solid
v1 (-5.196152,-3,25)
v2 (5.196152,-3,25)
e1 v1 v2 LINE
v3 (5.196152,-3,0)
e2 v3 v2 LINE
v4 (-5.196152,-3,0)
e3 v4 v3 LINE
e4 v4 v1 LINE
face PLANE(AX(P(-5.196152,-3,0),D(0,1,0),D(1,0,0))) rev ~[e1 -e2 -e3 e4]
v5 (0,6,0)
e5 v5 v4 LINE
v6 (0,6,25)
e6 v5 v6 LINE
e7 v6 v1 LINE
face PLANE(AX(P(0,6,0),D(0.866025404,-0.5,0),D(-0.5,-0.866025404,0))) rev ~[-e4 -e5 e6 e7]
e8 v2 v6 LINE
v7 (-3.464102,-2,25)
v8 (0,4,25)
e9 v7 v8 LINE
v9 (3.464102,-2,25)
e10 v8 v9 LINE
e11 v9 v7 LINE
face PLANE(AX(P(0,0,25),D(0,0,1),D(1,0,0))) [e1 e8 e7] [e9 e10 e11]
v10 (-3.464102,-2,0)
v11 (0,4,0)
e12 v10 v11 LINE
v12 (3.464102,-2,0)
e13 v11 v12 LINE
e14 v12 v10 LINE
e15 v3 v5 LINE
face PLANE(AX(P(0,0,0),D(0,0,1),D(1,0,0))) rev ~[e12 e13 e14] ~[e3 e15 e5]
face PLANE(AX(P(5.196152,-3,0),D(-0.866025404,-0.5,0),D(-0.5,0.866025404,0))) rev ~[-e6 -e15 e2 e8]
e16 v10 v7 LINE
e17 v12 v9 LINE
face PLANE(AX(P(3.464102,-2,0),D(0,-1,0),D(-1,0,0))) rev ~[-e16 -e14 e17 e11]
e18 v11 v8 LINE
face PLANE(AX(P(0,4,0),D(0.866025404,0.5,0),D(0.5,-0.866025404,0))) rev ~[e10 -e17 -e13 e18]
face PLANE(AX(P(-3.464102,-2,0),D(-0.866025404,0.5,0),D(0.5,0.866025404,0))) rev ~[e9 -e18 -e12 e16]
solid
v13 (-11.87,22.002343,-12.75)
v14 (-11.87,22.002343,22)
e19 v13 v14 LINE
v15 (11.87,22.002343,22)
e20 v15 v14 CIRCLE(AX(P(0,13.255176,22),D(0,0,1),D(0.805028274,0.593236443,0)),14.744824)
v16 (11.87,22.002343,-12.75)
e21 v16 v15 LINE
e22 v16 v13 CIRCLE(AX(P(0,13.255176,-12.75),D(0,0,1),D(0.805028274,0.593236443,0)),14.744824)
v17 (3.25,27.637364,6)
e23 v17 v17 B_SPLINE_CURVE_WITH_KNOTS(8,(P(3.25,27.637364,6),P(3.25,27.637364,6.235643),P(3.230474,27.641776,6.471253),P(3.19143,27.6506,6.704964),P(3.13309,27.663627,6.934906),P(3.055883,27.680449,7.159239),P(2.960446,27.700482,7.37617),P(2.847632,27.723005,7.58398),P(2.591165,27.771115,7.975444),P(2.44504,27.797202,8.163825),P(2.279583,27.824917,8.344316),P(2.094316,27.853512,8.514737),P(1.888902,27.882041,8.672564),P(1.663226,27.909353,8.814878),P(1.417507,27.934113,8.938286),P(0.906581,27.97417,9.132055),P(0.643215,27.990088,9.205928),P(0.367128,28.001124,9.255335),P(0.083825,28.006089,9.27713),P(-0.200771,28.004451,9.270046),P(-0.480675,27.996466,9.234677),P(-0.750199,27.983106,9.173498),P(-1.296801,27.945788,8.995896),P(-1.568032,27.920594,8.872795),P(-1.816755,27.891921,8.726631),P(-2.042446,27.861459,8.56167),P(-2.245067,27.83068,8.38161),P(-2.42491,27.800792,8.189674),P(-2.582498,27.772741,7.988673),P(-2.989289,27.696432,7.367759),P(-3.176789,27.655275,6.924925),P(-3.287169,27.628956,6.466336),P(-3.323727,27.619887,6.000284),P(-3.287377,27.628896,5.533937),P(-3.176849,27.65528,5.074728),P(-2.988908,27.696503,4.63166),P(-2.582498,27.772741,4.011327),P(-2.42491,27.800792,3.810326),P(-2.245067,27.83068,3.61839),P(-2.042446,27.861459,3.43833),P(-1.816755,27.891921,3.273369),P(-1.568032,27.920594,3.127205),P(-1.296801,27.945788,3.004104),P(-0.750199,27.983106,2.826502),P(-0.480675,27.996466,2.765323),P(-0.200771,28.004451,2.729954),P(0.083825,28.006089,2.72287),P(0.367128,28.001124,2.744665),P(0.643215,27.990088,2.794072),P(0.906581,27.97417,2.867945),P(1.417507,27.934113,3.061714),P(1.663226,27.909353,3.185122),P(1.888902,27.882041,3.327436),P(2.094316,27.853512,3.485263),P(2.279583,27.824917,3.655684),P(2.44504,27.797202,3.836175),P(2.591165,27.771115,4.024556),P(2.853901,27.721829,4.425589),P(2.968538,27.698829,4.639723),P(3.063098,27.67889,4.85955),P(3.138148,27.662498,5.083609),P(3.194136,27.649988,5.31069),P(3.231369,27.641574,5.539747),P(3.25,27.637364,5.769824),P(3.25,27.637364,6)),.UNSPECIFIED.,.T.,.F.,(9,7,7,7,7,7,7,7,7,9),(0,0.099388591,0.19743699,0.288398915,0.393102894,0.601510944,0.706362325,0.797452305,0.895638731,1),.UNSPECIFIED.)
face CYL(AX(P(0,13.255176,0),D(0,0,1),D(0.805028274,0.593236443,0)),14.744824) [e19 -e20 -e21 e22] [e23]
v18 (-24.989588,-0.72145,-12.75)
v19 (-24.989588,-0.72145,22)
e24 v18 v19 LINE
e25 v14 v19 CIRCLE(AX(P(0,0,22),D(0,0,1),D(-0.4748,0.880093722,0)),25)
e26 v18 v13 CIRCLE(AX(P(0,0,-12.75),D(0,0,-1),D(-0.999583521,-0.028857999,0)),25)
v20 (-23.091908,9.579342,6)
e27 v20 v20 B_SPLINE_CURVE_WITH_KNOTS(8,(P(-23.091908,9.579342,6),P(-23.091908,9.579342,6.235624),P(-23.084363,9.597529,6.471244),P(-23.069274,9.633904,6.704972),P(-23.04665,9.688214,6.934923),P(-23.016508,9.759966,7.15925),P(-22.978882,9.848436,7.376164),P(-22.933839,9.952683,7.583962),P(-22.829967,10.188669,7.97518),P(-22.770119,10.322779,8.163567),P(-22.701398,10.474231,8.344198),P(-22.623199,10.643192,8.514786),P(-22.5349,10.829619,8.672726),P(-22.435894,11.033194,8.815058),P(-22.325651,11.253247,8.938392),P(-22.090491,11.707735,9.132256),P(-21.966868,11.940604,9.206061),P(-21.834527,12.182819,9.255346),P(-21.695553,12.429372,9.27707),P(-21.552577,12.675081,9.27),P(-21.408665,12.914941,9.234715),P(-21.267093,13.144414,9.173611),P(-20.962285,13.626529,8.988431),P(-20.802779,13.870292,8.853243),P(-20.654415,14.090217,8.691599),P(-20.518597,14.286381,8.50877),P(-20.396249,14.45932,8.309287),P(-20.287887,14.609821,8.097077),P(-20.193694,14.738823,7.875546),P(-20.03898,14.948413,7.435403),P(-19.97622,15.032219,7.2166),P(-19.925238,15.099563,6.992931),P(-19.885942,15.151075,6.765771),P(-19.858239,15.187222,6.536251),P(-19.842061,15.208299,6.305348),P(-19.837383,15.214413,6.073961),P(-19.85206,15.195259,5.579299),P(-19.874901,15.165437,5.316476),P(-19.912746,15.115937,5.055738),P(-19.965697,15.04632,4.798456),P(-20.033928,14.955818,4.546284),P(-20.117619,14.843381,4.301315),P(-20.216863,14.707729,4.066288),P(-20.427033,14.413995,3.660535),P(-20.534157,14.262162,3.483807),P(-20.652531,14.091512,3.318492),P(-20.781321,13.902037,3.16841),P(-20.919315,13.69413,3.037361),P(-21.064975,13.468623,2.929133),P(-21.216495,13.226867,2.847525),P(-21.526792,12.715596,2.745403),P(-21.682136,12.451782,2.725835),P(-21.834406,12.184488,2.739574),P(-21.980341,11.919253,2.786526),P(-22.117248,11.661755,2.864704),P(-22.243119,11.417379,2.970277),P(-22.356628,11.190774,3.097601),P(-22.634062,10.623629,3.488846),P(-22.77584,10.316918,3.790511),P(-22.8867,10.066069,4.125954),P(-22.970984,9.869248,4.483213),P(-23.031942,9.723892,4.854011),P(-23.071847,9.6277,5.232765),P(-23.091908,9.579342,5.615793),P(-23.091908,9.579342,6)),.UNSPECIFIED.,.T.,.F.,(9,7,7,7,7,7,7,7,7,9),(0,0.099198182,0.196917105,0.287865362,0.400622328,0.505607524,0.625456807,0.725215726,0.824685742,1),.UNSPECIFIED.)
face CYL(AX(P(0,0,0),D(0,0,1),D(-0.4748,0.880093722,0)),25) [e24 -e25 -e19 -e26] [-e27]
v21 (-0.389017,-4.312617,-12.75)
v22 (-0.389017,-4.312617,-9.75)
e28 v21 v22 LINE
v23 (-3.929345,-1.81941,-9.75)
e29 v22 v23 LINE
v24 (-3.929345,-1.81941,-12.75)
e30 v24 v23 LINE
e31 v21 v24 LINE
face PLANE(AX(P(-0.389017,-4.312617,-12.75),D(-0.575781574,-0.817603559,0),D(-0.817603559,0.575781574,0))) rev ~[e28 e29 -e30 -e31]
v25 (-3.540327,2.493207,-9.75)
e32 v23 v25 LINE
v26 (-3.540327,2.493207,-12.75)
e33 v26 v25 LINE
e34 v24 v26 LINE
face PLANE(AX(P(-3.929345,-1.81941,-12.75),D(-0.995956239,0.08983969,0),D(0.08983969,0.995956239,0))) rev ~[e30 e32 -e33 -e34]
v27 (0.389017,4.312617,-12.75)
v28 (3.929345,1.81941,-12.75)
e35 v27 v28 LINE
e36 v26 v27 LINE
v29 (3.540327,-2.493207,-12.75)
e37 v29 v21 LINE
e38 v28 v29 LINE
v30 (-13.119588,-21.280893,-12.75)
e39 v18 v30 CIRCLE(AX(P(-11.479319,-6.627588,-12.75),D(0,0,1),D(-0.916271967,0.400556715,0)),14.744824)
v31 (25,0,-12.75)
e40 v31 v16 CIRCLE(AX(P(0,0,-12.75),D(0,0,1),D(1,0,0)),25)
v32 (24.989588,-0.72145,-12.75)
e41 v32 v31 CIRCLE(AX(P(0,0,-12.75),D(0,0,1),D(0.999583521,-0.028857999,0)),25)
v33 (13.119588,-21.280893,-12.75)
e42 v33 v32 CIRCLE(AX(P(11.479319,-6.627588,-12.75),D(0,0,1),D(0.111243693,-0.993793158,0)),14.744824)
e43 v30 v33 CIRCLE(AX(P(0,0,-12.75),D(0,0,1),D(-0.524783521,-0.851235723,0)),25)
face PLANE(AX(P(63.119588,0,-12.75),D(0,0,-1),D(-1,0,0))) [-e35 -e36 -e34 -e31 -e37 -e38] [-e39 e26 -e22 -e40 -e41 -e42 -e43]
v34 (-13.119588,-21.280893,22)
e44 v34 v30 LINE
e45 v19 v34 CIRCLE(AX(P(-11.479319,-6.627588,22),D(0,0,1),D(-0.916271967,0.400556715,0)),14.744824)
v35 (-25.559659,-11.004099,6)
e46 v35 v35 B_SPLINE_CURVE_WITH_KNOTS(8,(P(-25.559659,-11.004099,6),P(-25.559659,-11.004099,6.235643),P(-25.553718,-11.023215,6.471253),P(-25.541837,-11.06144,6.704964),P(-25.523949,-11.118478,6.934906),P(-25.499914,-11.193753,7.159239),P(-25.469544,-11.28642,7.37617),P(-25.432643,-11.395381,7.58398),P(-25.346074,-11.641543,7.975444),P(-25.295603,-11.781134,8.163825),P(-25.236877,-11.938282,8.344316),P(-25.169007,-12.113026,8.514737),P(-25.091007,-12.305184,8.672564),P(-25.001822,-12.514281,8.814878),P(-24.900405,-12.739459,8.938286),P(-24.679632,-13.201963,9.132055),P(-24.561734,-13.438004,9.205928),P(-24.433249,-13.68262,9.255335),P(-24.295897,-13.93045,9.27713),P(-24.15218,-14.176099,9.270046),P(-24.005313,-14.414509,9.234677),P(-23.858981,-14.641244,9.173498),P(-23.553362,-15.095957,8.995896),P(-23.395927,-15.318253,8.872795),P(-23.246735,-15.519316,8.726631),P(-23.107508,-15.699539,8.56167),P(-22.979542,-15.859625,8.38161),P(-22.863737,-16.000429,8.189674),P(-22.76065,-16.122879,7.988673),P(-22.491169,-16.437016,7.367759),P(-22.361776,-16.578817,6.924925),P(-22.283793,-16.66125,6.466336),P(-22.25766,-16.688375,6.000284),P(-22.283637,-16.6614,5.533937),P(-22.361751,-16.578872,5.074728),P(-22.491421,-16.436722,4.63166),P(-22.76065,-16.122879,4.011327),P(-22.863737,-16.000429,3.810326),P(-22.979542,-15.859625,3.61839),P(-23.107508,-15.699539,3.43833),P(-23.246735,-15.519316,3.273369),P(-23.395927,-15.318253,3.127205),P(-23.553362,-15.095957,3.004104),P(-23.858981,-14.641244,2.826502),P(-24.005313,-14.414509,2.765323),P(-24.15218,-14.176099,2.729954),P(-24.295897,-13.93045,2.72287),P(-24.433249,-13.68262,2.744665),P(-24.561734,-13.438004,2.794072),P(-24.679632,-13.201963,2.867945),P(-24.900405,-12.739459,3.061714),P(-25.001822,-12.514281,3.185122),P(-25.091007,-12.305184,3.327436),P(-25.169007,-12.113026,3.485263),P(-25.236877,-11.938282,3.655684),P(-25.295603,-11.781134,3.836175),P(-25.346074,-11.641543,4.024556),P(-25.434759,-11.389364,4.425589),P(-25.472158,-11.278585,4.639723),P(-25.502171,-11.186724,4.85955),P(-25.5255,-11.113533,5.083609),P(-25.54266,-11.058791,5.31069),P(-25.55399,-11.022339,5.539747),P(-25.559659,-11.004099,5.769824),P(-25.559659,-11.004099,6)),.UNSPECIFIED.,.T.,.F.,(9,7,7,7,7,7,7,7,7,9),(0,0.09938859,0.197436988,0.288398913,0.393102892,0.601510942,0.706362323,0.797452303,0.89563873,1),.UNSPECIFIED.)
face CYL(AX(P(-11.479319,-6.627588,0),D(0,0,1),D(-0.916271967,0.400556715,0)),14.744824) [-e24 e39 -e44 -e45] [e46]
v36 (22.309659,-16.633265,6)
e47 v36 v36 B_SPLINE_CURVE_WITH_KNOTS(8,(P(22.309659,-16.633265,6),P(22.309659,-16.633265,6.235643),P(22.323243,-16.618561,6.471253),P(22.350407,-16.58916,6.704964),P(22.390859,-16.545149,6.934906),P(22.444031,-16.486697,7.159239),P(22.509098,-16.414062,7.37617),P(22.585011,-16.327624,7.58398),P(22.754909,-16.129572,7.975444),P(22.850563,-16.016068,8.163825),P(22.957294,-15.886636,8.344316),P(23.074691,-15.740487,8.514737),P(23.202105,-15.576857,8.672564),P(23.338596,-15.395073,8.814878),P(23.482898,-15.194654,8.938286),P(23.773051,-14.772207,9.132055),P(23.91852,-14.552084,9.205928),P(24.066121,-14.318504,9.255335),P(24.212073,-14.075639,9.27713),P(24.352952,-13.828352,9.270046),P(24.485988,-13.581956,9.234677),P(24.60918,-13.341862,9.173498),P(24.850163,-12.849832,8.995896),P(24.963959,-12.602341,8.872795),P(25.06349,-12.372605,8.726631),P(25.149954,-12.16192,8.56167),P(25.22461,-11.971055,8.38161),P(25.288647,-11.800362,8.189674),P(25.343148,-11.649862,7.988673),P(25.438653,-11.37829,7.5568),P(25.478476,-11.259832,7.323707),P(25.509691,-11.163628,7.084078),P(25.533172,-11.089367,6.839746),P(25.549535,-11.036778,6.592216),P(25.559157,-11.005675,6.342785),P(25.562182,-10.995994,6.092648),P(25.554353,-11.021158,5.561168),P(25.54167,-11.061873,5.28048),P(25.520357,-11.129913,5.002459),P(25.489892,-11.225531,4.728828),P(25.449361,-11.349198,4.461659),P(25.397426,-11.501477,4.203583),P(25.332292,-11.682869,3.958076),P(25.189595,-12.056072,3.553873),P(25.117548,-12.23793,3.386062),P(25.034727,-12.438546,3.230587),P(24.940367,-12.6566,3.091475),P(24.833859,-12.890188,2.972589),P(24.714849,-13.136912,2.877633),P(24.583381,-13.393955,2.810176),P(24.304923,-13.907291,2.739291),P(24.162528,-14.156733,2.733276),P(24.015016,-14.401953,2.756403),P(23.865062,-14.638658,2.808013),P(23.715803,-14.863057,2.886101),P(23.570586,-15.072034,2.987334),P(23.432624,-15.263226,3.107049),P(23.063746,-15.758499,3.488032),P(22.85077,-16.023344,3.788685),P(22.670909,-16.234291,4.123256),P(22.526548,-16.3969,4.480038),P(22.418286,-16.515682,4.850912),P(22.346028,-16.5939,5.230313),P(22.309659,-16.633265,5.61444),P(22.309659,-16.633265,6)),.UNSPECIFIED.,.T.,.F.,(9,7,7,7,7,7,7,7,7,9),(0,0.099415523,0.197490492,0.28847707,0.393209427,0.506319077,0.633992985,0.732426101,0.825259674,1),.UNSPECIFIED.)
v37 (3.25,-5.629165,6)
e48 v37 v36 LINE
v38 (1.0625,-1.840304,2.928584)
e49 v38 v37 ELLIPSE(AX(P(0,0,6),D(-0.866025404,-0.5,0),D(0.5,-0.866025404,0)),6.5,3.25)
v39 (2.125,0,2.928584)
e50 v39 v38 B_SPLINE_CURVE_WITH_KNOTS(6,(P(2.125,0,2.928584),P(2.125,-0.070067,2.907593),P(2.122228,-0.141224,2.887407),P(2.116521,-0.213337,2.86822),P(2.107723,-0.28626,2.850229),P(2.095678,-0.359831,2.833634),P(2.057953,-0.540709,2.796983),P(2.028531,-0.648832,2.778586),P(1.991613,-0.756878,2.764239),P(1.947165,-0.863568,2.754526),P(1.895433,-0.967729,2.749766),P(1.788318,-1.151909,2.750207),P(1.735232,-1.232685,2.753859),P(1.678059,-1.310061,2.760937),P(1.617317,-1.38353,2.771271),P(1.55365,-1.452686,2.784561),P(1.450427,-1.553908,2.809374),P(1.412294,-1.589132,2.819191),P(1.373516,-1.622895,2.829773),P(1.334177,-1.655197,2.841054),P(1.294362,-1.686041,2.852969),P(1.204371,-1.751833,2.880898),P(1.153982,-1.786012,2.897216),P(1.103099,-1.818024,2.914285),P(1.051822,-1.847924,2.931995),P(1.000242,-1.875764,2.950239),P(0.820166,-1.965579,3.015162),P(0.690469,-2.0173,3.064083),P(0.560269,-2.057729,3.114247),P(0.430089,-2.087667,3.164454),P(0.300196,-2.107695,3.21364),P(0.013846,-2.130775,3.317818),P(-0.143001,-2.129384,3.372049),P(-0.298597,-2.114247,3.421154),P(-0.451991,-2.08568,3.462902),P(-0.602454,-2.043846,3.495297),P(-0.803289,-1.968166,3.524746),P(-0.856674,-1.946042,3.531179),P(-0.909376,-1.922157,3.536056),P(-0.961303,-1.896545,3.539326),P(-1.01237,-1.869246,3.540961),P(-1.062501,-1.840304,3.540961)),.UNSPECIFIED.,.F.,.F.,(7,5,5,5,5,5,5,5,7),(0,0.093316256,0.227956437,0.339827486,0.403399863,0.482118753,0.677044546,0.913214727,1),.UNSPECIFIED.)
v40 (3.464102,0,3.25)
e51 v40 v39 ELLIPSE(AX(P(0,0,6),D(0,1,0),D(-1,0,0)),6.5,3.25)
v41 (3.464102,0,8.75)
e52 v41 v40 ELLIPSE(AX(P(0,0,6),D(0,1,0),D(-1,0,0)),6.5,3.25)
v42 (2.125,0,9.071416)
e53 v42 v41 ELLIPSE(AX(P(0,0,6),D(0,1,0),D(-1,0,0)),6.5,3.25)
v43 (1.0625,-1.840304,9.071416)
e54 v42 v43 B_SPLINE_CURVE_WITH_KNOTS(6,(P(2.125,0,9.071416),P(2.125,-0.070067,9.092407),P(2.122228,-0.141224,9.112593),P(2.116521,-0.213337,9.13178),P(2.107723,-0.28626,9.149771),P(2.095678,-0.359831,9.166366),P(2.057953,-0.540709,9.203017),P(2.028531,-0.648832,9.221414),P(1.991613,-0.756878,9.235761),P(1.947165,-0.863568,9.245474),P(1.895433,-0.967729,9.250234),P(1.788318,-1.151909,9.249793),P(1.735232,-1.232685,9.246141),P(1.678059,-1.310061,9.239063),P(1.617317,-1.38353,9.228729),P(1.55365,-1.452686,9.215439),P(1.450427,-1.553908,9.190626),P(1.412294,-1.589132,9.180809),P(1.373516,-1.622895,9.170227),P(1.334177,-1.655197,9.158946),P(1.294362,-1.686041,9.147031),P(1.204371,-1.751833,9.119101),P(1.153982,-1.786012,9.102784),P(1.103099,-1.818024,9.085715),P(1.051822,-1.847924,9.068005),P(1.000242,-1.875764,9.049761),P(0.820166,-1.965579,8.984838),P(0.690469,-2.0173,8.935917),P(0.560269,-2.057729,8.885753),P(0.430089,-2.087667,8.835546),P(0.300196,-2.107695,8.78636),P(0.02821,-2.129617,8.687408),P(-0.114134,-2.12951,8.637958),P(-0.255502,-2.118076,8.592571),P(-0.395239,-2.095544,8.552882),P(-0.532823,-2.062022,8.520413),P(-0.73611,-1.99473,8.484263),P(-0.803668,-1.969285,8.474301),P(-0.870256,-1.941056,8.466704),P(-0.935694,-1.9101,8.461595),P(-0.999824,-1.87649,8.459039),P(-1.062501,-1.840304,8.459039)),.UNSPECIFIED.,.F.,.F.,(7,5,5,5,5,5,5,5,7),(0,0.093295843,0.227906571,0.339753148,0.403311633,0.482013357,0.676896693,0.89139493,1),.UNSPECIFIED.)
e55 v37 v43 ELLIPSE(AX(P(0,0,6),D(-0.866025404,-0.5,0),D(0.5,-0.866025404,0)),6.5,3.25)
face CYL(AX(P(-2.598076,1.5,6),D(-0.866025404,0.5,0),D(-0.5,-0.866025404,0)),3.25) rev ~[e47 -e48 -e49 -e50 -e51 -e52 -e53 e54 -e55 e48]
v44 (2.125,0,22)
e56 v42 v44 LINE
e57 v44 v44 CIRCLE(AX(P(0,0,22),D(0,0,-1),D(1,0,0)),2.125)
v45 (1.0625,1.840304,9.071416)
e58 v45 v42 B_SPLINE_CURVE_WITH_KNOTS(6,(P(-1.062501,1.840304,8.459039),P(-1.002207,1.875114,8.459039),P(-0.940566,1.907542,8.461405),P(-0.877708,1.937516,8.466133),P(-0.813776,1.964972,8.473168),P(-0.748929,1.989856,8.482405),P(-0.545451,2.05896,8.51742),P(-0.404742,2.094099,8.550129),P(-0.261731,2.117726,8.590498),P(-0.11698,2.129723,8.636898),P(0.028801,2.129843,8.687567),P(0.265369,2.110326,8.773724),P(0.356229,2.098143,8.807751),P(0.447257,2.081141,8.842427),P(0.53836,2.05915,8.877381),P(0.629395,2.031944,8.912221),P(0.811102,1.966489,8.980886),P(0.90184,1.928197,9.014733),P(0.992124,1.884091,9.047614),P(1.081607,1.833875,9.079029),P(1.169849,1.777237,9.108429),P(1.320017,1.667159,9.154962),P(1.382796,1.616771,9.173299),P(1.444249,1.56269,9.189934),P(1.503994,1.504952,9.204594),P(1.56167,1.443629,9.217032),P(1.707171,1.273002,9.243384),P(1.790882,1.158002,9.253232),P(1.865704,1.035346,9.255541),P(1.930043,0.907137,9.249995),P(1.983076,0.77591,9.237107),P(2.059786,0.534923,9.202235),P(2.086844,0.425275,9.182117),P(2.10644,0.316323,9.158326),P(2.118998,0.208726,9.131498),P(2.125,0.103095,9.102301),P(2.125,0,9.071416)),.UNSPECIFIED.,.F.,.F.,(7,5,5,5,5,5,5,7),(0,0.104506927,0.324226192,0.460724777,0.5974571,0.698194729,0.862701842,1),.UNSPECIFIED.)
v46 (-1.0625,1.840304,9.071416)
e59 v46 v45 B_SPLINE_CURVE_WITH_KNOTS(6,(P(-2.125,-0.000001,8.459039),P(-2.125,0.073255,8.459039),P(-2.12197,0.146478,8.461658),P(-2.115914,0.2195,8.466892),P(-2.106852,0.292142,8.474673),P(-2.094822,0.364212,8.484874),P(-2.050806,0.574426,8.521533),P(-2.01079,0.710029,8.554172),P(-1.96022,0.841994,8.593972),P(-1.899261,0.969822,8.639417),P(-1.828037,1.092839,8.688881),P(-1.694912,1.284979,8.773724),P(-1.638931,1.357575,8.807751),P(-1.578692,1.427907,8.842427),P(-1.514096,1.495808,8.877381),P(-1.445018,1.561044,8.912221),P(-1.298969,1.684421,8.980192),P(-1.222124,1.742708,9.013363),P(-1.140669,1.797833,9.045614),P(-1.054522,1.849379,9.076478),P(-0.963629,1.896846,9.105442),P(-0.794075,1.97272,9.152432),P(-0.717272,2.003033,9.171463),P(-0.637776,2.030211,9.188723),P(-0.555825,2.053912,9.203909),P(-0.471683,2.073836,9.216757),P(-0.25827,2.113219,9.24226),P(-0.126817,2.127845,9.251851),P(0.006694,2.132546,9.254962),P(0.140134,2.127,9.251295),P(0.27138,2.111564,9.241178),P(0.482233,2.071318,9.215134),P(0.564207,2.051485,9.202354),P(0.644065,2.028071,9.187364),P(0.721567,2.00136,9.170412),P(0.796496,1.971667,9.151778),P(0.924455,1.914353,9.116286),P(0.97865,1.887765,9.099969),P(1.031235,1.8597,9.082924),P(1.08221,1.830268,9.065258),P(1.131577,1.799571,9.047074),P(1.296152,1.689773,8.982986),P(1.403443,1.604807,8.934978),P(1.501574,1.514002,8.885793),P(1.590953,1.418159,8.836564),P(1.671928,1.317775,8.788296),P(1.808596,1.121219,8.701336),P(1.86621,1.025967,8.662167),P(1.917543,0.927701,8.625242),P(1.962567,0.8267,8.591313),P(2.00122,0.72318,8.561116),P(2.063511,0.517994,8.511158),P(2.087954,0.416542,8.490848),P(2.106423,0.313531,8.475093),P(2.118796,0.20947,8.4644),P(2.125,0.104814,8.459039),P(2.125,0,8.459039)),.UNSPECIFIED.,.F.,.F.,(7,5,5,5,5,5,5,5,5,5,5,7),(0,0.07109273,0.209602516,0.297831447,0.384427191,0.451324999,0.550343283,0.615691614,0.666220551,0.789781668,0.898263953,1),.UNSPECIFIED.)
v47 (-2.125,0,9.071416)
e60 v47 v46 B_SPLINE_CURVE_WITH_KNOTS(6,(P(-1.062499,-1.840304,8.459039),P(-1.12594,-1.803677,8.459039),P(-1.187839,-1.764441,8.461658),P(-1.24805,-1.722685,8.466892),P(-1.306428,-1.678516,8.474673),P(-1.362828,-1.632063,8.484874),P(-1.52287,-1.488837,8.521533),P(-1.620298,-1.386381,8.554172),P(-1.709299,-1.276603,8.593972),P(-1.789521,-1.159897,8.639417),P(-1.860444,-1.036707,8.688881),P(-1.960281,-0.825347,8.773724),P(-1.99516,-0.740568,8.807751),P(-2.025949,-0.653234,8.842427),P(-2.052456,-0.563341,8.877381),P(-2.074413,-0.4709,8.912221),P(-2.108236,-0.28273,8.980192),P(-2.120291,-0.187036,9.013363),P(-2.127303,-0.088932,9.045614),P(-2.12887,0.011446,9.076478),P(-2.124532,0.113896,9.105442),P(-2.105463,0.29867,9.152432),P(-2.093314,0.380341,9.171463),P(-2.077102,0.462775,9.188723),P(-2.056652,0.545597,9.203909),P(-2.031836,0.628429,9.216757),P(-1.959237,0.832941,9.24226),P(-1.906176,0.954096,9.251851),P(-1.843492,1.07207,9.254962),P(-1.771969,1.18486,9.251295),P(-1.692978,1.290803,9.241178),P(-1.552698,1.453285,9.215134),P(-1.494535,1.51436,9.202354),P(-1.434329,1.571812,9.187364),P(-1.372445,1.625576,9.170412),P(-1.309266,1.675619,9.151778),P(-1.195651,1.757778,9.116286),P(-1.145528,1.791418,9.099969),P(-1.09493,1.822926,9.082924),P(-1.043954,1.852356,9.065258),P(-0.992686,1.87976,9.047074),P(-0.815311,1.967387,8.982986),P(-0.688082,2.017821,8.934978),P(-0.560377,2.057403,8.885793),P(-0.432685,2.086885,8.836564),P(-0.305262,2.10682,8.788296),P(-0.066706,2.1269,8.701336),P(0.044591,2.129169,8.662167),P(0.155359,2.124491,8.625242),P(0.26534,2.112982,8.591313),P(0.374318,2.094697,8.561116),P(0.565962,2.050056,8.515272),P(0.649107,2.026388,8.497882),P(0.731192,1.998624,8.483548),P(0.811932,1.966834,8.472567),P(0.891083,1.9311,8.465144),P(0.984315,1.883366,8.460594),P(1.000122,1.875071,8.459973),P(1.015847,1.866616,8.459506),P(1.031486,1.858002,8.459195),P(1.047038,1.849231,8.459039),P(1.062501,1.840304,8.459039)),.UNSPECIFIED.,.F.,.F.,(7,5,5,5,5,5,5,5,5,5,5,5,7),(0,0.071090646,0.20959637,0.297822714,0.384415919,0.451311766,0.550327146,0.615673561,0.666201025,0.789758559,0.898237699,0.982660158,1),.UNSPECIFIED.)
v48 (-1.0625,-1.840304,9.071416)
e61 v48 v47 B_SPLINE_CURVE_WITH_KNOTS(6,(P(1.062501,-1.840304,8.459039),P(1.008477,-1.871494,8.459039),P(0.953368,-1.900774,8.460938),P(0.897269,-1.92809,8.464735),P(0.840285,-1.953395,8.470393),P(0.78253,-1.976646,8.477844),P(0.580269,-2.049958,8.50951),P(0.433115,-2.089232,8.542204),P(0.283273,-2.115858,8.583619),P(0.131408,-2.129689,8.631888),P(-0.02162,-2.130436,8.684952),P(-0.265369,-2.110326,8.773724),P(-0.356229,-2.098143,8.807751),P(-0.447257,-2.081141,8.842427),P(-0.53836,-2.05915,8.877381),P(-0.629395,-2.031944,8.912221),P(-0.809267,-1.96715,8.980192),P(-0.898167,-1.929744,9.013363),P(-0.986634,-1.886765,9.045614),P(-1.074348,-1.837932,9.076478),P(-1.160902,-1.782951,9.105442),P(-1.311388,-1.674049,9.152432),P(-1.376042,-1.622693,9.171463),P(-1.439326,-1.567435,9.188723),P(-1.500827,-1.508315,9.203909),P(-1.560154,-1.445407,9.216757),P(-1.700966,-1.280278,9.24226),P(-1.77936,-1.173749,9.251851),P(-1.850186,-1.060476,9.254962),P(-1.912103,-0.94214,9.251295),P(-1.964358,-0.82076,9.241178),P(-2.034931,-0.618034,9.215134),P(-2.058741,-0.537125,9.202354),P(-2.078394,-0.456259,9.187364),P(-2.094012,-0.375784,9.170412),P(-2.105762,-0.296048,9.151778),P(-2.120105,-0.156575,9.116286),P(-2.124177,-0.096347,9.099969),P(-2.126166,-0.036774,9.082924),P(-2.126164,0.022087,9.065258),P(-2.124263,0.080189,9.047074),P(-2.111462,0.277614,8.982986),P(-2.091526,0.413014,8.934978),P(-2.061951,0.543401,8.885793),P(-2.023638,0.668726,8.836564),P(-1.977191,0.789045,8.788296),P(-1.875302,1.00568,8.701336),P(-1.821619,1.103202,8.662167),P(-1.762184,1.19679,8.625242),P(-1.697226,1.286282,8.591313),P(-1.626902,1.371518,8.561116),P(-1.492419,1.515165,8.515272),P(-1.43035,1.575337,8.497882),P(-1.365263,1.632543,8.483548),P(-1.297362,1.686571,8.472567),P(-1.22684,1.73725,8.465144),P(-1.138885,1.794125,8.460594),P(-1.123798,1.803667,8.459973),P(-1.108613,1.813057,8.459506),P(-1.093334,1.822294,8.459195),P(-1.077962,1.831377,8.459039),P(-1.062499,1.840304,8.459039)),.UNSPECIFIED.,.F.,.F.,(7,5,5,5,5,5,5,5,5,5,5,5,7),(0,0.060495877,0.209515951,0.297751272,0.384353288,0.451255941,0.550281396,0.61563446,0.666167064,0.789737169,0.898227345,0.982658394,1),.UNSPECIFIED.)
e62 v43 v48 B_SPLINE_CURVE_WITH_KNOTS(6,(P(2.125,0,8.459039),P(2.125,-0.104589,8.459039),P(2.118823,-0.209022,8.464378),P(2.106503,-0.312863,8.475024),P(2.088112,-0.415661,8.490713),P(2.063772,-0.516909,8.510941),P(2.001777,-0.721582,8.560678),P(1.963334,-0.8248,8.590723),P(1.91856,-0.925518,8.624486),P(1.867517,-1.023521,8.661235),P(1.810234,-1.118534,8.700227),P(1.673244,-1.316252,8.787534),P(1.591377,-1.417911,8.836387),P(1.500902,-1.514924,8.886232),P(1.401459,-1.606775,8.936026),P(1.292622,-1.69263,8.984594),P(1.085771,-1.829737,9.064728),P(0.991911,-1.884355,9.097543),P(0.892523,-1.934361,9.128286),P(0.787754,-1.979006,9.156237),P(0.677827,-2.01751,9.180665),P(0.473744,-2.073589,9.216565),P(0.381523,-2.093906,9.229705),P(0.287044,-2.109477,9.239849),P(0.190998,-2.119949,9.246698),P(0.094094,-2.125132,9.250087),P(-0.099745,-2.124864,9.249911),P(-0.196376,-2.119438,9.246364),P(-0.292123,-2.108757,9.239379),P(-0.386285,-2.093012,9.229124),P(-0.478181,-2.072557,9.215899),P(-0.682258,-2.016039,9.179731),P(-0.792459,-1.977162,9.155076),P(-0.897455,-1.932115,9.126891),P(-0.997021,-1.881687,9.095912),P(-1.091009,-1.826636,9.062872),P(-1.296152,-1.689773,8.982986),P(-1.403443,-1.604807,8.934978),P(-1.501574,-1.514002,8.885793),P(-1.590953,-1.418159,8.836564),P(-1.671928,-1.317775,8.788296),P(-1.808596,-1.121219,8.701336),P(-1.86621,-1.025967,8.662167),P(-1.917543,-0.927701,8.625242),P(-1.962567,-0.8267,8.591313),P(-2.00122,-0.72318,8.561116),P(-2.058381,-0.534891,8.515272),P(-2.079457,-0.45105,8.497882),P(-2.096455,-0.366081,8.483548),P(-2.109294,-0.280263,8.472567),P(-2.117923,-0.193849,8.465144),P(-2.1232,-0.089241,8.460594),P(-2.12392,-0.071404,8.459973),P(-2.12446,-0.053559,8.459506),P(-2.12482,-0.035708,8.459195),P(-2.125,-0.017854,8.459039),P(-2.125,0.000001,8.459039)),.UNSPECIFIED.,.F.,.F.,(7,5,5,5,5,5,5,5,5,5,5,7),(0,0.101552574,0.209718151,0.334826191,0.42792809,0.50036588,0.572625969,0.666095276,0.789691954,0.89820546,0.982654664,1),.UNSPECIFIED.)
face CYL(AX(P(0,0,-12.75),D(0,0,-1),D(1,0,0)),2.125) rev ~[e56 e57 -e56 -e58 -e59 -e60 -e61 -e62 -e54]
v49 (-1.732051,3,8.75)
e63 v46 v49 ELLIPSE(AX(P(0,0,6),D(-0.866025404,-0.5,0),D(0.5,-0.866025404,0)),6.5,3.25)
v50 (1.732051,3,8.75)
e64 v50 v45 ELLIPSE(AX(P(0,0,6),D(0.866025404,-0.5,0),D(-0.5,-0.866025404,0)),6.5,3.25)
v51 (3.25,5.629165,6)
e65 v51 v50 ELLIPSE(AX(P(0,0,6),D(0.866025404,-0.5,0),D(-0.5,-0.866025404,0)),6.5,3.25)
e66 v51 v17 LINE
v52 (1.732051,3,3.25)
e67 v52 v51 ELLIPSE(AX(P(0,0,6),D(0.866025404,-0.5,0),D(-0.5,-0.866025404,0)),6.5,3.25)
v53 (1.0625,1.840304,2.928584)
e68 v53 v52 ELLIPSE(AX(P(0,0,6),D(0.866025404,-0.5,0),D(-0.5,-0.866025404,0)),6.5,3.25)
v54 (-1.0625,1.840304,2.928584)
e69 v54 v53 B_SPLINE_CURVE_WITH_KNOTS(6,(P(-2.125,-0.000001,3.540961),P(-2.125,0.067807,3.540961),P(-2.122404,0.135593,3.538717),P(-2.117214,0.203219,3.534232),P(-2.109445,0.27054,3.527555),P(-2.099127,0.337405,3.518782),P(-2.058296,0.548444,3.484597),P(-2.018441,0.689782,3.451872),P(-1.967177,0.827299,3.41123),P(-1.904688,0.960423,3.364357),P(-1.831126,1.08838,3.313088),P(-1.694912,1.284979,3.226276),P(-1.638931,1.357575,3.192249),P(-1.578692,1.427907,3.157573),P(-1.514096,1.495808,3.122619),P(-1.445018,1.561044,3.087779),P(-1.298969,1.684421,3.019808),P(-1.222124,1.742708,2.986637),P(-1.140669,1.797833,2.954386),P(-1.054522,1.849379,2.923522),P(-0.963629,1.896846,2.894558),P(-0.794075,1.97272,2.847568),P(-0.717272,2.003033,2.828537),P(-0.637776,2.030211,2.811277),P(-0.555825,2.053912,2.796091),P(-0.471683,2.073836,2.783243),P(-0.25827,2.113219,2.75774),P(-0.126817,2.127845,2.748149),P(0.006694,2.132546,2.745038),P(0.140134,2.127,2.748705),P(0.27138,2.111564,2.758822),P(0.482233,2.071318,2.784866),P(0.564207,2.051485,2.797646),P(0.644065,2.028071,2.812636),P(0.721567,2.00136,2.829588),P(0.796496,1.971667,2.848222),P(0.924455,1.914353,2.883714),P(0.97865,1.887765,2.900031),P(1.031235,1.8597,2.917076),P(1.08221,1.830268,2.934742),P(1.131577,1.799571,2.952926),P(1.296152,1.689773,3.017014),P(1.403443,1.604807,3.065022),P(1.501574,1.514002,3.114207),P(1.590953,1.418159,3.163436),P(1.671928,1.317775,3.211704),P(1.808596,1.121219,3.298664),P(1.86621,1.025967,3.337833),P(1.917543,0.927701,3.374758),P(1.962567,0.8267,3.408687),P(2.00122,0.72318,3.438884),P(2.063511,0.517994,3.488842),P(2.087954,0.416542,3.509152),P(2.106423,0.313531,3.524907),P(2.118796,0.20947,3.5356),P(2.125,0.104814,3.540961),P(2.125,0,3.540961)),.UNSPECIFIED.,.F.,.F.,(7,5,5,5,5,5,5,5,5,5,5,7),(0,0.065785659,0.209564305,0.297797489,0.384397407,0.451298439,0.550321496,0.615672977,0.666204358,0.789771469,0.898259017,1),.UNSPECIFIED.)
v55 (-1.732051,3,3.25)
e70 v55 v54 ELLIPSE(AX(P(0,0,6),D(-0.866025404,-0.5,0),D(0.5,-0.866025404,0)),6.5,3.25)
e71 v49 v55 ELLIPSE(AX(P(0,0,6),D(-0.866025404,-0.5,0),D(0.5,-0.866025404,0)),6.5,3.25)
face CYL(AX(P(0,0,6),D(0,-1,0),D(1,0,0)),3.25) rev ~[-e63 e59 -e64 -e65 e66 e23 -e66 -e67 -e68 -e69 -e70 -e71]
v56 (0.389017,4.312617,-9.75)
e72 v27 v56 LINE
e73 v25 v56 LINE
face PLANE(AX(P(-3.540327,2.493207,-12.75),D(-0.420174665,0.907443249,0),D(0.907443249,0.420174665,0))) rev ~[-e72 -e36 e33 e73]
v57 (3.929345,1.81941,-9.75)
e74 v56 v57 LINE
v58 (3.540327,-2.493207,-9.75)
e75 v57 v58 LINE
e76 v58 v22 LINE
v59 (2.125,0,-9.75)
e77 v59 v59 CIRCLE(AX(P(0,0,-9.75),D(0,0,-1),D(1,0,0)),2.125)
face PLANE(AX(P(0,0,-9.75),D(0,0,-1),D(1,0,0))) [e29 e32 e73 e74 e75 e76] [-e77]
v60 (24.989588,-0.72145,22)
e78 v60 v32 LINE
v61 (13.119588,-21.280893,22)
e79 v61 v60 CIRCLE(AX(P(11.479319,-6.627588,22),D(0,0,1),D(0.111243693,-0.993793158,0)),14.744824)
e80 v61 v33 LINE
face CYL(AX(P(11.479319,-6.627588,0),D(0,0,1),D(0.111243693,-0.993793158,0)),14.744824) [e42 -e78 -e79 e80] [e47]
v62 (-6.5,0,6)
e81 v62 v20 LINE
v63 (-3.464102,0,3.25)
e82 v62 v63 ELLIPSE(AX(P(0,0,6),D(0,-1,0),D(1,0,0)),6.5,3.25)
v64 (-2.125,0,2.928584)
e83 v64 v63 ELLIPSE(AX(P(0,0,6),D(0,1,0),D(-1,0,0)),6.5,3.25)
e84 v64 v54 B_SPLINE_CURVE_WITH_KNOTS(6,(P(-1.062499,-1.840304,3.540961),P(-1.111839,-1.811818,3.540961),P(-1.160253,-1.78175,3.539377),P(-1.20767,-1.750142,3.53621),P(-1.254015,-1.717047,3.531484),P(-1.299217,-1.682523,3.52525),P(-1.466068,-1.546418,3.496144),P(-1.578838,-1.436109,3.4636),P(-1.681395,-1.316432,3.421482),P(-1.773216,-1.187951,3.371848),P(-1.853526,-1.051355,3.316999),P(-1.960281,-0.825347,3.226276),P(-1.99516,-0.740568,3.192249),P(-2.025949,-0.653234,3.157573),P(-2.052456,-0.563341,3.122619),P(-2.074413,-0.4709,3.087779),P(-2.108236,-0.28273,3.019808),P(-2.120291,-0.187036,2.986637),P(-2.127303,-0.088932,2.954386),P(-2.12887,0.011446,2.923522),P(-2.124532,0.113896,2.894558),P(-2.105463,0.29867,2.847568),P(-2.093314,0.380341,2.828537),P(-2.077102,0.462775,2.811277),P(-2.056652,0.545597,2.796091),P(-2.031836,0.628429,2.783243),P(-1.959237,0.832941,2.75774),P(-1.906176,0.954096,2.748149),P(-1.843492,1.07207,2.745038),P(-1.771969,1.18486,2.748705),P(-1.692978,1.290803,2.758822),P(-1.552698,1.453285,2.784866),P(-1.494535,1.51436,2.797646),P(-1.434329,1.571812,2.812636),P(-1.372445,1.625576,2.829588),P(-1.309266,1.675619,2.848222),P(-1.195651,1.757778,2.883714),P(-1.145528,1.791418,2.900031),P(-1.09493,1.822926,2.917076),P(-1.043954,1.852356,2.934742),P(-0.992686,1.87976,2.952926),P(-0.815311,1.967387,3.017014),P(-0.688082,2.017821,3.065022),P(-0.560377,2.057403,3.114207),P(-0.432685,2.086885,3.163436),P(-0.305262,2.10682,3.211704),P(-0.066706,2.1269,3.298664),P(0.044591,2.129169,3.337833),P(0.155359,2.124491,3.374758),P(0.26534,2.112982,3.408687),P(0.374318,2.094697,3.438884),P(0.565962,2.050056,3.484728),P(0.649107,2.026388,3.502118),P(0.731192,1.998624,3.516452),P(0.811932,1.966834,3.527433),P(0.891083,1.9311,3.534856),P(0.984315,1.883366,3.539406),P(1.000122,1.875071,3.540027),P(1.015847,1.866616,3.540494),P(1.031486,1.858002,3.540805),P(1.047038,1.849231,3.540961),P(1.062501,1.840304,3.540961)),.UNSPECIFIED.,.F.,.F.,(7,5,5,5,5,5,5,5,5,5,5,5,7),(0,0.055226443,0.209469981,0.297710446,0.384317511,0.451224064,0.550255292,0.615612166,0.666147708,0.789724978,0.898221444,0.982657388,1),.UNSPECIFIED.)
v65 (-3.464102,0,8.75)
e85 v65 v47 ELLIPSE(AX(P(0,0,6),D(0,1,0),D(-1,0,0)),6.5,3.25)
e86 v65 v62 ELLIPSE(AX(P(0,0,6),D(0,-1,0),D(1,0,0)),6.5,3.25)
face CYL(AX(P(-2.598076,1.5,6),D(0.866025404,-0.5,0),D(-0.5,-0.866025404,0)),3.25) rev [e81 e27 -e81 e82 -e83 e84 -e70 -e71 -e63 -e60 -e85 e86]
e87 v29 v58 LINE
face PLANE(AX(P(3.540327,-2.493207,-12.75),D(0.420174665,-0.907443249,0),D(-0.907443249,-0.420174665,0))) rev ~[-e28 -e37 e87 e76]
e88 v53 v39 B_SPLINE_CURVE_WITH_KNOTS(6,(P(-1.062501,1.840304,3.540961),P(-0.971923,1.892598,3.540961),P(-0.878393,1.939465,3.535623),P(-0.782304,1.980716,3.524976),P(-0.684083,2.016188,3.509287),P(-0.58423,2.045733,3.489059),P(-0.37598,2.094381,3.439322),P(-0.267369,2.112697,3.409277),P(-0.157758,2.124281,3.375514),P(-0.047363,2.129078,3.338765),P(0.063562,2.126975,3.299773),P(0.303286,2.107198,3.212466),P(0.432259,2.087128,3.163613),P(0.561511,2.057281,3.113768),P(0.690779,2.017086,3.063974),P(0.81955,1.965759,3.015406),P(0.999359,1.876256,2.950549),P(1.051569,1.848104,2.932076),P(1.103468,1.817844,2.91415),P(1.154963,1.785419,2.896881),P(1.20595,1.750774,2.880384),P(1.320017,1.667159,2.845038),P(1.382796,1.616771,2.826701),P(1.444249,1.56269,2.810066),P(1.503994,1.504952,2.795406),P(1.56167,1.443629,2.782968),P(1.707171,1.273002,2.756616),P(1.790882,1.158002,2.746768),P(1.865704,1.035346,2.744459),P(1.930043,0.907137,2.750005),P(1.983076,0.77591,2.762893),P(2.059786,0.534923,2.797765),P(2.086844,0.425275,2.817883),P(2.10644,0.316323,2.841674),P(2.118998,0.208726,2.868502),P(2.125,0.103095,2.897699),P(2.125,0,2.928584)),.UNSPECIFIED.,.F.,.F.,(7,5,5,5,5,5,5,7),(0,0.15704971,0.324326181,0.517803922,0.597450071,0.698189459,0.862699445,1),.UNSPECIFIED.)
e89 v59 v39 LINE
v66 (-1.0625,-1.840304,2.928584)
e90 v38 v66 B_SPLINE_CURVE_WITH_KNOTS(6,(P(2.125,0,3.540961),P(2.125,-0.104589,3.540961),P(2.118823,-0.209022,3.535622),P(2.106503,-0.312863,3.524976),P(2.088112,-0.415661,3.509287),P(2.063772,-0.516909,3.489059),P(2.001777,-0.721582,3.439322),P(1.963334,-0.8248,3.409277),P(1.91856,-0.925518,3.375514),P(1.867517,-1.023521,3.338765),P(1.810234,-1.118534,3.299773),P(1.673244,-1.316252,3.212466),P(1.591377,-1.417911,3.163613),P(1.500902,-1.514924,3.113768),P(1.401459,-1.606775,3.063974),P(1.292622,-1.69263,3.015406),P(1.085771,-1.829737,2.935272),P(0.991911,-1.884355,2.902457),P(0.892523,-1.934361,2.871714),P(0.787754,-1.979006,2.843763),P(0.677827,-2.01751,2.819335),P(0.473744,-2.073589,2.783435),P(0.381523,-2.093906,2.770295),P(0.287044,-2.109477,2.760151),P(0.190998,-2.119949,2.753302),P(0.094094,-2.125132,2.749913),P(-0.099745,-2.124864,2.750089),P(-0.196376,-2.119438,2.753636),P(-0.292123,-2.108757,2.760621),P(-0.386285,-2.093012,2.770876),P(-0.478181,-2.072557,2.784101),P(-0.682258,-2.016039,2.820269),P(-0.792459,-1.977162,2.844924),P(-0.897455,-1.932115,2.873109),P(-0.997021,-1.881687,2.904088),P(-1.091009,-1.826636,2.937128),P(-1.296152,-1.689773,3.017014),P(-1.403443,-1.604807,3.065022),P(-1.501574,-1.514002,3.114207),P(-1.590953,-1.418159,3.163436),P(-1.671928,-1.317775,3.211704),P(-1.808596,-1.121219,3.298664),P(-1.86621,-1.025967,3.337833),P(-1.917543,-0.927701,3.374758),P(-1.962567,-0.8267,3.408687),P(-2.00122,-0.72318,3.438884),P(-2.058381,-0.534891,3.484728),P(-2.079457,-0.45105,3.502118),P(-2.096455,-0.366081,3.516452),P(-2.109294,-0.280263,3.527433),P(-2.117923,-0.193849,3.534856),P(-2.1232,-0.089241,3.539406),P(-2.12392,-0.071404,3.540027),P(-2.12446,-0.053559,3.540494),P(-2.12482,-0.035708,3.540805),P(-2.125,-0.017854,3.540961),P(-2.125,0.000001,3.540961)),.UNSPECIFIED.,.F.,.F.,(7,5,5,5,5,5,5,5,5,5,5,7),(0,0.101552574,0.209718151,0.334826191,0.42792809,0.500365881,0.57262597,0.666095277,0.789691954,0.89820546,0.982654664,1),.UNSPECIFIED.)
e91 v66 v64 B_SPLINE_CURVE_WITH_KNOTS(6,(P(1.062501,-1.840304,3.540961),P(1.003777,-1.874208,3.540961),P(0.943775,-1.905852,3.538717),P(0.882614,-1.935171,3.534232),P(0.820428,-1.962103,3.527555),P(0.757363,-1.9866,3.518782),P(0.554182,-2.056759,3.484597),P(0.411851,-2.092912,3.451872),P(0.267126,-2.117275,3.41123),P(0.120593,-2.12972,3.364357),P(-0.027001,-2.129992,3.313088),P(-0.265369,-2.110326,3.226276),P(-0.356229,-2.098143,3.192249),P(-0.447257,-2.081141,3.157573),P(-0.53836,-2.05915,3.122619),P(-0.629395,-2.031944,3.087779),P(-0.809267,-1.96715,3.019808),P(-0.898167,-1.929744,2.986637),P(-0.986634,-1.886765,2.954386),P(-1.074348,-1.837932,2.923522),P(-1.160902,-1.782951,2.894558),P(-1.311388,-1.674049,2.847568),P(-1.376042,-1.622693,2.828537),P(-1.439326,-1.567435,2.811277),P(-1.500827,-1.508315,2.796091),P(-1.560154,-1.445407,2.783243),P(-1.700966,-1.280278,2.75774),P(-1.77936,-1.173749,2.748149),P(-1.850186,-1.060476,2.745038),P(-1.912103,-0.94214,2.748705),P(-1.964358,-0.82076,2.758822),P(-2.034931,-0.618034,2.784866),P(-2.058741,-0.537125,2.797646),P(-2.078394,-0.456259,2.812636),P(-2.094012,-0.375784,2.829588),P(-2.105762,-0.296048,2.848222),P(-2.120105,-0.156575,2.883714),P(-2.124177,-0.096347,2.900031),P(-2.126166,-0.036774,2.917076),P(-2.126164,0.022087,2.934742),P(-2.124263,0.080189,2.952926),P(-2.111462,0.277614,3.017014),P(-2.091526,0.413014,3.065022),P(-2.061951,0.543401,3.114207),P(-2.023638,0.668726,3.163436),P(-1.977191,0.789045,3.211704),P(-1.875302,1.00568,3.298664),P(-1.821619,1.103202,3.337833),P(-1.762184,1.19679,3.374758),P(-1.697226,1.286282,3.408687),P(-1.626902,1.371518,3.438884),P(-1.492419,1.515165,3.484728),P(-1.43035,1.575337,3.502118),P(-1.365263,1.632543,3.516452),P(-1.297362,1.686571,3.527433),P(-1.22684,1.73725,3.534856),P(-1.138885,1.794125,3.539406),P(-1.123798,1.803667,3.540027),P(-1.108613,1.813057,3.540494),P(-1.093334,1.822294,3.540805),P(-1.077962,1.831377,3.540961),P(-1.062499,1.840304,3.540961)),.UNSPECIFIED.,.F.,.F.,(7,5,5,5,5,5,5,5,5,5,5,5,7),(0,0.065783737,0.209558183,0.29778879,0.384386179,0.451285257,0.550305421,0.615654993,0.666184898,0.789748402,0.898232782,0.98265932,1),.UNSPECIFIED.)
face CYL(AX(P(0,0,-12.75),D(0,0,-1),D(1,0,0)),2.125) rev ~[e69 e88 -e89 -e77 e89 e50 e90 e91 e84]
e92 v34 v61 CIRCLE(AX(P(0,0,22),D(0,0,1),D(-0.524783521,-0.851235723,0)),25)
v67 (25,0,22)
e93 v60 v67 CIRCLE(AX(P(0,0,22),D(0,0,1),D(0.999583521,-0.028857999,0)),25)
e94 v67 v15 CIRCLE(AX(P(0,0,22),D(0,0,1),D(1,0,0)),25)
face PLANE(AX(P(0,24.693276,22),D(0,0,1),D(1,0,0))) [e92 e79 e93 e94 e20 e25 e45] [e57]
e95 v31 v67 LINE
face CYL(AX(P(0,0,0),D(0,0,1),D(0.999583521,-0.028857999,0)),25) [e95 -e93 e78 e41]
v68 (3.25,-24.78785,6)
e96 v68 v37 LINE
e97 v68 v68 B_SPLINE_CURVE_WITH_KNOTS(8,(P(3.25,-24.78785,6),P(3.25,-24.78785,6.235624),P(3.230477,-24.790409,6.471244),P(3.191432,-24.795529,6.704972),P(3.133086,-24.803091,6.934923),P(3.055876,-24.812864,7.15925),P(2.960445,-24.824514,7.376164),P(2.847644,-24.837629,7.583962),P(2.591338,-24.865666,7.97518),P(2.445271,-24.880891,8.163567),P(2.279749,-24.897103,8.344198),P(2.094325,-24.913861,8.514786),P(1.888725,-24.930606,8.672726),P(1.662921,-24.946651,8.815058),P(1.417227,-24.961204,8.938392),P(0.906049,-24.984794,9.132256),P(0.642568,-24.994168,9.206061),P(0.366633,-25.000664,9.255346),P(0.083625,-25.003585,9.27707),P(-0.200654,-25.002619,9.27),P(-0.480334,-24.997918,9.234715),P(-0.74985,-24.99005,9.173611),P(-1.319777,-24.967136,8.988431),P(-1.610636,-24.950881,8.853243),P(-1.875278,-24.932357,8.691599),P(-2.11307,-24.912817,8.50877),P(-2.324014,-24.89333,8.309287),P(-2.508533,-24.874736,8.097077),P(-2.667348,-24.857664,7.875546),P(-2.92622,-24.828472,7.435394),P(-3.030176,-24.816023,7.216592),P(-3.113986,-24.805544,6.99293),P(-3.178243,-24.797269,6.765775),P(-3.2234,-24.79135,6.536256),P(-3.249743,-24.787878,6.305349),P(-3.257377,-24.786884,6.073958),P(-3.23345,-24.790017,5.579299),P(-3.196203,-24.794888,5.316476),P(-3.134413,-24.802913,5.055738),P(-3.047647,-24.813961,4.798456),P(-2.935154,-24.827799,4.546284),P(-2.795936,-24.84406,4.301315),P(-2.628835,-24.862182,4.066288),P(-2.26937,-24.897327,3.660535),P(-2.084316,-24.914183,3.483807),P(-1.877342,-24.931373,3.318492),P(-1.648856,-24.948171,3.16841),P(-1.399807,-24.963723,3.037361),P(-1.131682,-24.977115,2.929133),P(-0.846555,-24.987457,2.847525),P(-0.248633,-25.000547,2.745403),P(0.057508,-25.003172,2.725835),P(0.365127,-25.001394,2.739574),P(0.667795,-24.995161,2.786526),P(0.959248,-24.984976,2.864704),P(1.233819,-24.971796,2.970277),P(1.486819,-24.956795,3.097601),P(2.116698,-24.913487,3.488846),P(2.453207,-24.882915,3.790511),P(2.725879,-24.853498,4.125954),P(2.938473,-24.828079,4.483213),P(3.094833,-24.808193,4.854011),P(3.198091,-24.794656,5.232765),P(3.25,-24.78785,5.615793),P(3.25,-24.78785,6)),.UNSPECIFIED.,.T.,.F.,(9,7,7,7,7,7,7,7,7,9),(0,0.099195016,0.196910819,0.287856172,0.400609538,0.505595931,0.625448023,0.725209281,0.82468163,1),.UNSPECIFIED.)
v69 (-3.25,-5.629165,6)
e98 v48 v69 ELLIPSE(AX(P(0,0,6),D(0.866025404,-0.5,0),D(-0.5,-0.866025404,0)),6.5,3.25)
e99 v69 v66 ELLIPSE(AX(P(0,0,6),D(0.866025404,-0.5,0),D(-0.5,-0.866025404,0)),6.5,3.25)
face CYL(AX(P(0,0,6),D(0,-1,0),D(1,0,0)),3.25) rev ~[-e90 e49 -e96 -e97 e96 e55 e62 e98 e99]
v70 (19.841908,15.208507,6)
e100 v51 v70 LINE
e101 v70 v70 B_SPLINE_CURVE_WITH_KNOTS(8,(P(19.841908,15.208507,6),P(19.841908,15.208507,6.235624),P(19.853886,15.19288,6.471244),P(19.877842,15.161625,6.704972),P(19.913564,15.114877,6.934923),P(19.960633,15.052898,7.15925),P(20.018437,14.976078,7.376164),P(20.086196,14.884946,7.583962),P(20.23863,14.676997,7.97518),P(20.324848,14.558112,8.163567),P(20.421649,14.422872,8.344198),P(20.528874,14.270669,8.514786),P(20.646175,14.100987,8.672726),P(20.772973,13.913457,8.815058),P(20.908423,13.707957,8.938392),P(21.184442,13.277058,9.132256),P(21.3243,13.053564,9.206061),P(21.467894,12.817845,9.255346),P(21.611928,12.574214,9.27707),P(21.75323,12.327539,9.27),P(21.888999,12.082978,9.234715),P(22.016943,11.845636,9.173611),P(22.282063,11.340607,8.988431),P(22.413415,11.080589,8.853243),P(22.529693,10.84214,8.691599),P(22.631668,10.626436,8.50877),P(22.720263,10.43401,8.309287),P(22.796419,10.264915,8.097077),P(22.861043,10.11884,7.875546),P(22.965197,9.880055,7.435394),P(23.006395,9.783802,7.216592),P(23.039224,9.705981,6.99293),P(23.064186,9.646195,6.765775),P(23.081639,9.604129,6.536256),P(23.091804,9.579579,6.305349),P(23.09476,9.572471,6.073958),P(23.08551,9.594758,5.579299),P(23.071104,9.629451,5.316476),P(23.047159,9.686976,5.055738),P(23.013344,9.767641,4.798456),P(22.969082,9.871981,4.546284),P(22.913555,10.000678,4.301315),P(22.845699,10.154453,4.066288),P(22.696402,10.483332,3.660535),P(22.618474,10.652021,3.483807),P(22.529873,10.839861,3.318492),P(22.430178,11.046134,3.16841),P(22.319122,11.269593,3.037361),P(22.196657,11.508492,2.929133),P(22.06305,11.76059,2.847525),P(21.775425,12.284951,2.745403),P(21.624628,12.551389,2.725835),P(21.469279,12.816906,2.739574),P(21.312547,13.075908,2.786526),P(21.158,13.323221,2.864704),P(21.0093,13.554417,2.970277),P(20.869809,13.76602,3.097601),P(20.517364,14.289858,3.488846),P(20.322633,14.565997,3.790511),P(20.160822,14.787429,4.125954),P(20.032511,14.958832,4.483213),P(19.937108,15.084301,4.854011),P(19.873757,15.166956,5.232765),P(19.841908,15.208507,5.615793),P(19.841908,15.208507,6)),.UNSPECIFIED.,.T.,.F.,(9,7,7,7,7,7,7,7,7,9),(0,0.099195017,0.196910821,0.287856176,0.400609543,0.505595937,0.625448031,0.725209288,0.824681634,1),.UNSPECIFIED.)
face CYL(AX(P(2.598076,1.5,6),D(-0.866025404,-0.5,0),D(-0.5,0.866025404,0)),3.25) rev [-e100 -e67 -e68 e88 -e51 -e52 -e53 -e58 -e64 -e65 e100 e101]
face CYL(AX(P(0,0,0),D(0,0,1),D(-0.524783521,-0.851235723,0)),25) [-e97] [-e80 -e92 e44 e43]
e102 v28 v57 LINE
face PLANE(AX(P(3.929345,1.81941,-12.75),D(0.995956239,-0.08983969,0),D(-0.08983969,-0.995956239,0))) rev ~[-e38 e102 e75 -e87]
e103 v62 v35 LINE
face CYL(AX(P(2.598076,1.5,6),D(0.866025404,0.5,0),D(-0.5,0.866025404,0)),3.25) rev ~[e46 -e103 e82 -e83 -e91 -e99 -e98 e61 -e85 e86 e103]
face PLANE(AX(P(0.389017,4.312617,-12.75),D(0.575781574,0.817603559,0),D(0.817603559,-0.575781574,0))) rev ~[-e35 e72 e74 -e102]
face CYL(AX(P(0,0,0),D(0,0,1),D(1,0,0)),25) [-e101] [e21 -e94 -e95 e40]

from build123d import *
from build123d import SkipClean  # not in build123d's __all__

# Parameters (mm, degrees)
F1_DEPTH       = 22
F3_R           = 3.25
F4_DEPTH       = 50
F4_DEPTH_BACK  = 50
F6_DEPTH       = 25
F7_R           = 3.25
F8_DEPTH       = 25
F8_DEPTH_BACK  = 40
F9_R           = 3.25
F10_DEPTH      = 25
F10_DEPTH_BACK = 40
F11_DEPTH      = 13.75
F13_DEPTH      = 250
F13_DEPTH_BACK = 250
F14_R          = 2.125
F15_DEPTH      = 100
F16_DEPTH      = 3


# Not quite as in the source:
# - after a boolean that leaves OpenCascade's solid faulty, fix() repairs it
# - a feature names something its author has since deleted; it is built from what else it names


with BuildPart() as f1:
    # F0 (on Top) → F1 (new body)
    with BuildSketch(Plane.XY):
        with BuildLine():
            ThreePointArc((-11.87, 22.002343057), (0, 25), (11.87, 22.002343057))
            ThreePointArc((11.87, 22.002343057), (0, 28), (-11.87, 22.002343057))
        make_face()
        with BuildLine():
            ThreePointArc((-13.1195880302, -21.2808930714), (-21.6506350946, -12.5), (-24.9895880302, -0.7214499856))
            ThreePointArc((-24.9895880302, -0.7214499856), (-24.248711306, -14), (-13.1195880302, -21.2808930714))
        make_face()
        with BuildLine():
            ThreePointArc((13.1195880302, -21.2808930714), (24.248711306, -14), (24.9895880302, -0.7214499856))
            ThreePointArc((24.9895880302, -0.7214499856), (21.6506350946, -12.5), (13.1195880302, -21.2808930714))
        make_face()
        with BuildLine():
            ThreePointArc((24.9895880302, -0.7214499856), (24.997396872, -0.3607625572), (25, 0))
            ThreePointArc((25, 0), (21.467999441, 12.8111279753), (11.87, 22.002343057))
            ThreePointArc((11.87, 22.002343057), (0, 25), (-11.87, 22.002343057))
            ThreePointArc((-11.87, 22.002343057), (-21.6506350946, 12.5), (-24.9895880302, -0.7214499856))
            ThreePointArc((-24.9895880302, -0.7214499856), (-21.6506350946, -12.5), (-13.1195880302, -21.2808930714))
            ThreePointArc((-13.1195880302, -21.2808930714), (0, -25), (13.1195880302, -21.2808930714))
            ThreePointArc((13.1195880302, -21.2808930714), (21.6506350946, -12.5), (24.9895880302, -0.7214499856))
        make_face()
    extrude(amount=F1_DEPTH)

    # F3 (on offset) → F4 (cut, two sides)
    with BuildSketch(Plane.XZ) as f4_sk:
        with Locations((0, 6)):
            Circle(F3_R)
    extrude(amount=F4_DEPTH, mode=Mode.SUBTRACT)
    extrude(f4_sk.sketch, amount=-F4_DEPTH_BACK, mode=Mode.SUBTRACT)

    # F7 (on face) → F8 (cut, two sides)
    with BuildSketch(Plane(origin=(-2.5980762114, 1.5, 0), x_dir=(-0.5, -0.8660254038, 0), z_dir=(-0.8660254038, 0.5, 0))) as f8_sk:
        with Locations((0, 6)):
            Circle(F7_R)
    extrude(amount=F8_DEPTH, mode=Mode.SUBTRACT)
    extrude(f8_sk.sketch, amount=-F8_DEPTH_BACK, mode=Mode.SUBTRACT)

    # F9 (on face) → F10 (cut, two sides)
    with BuildSketch(Plane(origin=(2.5980762114, 1.5, 0), x_dir=(-0.5, 0.8660254038, 0), z_dir=(0.8660254038, 0.5, 0))) as f10_sk:
        with Locations((0, 6)):
            Circle(F9_R)
    extrude(amount=F10_DEPTH, mode=Mode.SUBTRACT)
    extrude(f10_sk.sketch, amount=-F10_DEPTH_BACK, mode=Mode.SUBTRACT)

    # F0 (on Top) → F11 (join)
    with BuildSketch(Plane.XY):
        with BuildLine():
            ThreePointArc((24.9895880302, -0.7214499856), (24.997396872, -0.3607625572), (25, 0))
            ThreePointArc((25, 0), (21.467999441, 12.8111279753), (11.87, 22.002343057))
            ThreePointArc((11.87, 22.002343057), (0, 25), (-11.87, 22.002343057))
            ThreePointArc((-11.87, 22.002343057), (-21.6506350946, 12.5), (-24.9895880302, -0.7214499856))
            ThreePointArc((-24.9895880302, -0.7214499856), (-21.6506350946, -12.5), (-13.1195880302, -21.2808930714))
            ThreePointArc((-13.1195880302, -21.2808930714), (0, -25), (13.1195880302, -21.2808930714))
            ThreePointArc((13.1195880302, -21.2808930714), (21.6506350946, -12.5), (24.9895880302, -0.7214499856))
        make_face()
        with BuildLine():
            ThreePointArc((-11.87, 22.002343057), (0, 25), (11.87, 22.002343057))
            ThreePointArc((11.87, 22.002343057), (0, 28), (-11.87, 22.002343057))
        make_face()
        with BuildLine():
            ThreePointArc((13.1195880302, -21.2808930714), (24.248711306, -14), (24.9895880302, -0.7214499856))
            ThreePointArc((24.9895880302, -0.7214499856), (21.6506350946, -12.5), (13.1195880302, -21.2808930714))
        make_face()
        with BuildLine():
            ThreePointArc((-13.1195880302, -21.2808930714), (-21.6506350946, -12.5), (-24.9895880302, -0.7214499856))
            ThreePointArc((-24.9895880302, -0.7214499856), (-24.248711306, -14), (-13.1195880302, -21.2808930714))
        make_face()
    with SkipClean():  # cleaning this boolean's faces spoils the solid; the shape is the same uncleaned
        extrude(amount=-F11_DEPTH)

    # F12 (on Front) → F13 (cut, two sides)
    with BuildSketch(Plane.XZ) as f13_sk:
        Polygon((-63.1195880302, -13.75), (-13.1195880302, -13.75), (13.1195880302, -13.75), (63.1195880302, -13.75), (63.1195880302, -12.75), (0, -12.75), (-63.1195880302, -12.75), align=None)
    extrude(amount=-F13_DEPTH, mode=Mode.SUBTRACT)
    extrude(f13_sk.sketch, amount=F13_DEPTH_BACK, mode=Mode.SUBTRACT)

    add(f1.part.fix(), mode=Mode.REPLACE)

    # F14 (on face) → F15 (cut)
    with BuildSketch(Plane(origin=(0, 0, -12.75), x_dir=(1, 0, 0), z_dir=(0, 0, -1))):
        Circle(F14_R)
    extrude(amount=-F15_DEPTH, mode=Mode.SUBTRACT)

    # F14 (on face) → F16 (cut)
    with BuildSketch(Plane(origin=(0, 0, -12.75), x_dir=(1, 0, 0), z_dir=(0, 0, -1))):
        Polygon((0.3890172707, -4.3126170202), (3.9293445317, -1.8194096711), (3.5403272609, 2.4932073491), (-0.3890172707, 4.3126170202), (-3.9293445317, 1.8194096711), (-3.5403272609, -2.4932073491), align=None)
        Circle(F14_R, mode=Mode.SUBTRACT)
    extrude(amount=-F16_DEPTH, mode=Mode.SUBTRACT)


with BuildPart() as f6:
    # F5 (on Top) → F6 (new body)
    with BuildSketch(Plane.XY):
        Polygon((-5.1961524227, -3), (5.1961524227, -3), (0, 6), align=None)
        Polygon((0, 4), (3.4641016151, -2), (-3.4641016151, -2), align=None, mode=Mode.SUBTRACT)
    extrude(amount=F6_DEPTH)


solid = Compound([f1.part, f6.part])
